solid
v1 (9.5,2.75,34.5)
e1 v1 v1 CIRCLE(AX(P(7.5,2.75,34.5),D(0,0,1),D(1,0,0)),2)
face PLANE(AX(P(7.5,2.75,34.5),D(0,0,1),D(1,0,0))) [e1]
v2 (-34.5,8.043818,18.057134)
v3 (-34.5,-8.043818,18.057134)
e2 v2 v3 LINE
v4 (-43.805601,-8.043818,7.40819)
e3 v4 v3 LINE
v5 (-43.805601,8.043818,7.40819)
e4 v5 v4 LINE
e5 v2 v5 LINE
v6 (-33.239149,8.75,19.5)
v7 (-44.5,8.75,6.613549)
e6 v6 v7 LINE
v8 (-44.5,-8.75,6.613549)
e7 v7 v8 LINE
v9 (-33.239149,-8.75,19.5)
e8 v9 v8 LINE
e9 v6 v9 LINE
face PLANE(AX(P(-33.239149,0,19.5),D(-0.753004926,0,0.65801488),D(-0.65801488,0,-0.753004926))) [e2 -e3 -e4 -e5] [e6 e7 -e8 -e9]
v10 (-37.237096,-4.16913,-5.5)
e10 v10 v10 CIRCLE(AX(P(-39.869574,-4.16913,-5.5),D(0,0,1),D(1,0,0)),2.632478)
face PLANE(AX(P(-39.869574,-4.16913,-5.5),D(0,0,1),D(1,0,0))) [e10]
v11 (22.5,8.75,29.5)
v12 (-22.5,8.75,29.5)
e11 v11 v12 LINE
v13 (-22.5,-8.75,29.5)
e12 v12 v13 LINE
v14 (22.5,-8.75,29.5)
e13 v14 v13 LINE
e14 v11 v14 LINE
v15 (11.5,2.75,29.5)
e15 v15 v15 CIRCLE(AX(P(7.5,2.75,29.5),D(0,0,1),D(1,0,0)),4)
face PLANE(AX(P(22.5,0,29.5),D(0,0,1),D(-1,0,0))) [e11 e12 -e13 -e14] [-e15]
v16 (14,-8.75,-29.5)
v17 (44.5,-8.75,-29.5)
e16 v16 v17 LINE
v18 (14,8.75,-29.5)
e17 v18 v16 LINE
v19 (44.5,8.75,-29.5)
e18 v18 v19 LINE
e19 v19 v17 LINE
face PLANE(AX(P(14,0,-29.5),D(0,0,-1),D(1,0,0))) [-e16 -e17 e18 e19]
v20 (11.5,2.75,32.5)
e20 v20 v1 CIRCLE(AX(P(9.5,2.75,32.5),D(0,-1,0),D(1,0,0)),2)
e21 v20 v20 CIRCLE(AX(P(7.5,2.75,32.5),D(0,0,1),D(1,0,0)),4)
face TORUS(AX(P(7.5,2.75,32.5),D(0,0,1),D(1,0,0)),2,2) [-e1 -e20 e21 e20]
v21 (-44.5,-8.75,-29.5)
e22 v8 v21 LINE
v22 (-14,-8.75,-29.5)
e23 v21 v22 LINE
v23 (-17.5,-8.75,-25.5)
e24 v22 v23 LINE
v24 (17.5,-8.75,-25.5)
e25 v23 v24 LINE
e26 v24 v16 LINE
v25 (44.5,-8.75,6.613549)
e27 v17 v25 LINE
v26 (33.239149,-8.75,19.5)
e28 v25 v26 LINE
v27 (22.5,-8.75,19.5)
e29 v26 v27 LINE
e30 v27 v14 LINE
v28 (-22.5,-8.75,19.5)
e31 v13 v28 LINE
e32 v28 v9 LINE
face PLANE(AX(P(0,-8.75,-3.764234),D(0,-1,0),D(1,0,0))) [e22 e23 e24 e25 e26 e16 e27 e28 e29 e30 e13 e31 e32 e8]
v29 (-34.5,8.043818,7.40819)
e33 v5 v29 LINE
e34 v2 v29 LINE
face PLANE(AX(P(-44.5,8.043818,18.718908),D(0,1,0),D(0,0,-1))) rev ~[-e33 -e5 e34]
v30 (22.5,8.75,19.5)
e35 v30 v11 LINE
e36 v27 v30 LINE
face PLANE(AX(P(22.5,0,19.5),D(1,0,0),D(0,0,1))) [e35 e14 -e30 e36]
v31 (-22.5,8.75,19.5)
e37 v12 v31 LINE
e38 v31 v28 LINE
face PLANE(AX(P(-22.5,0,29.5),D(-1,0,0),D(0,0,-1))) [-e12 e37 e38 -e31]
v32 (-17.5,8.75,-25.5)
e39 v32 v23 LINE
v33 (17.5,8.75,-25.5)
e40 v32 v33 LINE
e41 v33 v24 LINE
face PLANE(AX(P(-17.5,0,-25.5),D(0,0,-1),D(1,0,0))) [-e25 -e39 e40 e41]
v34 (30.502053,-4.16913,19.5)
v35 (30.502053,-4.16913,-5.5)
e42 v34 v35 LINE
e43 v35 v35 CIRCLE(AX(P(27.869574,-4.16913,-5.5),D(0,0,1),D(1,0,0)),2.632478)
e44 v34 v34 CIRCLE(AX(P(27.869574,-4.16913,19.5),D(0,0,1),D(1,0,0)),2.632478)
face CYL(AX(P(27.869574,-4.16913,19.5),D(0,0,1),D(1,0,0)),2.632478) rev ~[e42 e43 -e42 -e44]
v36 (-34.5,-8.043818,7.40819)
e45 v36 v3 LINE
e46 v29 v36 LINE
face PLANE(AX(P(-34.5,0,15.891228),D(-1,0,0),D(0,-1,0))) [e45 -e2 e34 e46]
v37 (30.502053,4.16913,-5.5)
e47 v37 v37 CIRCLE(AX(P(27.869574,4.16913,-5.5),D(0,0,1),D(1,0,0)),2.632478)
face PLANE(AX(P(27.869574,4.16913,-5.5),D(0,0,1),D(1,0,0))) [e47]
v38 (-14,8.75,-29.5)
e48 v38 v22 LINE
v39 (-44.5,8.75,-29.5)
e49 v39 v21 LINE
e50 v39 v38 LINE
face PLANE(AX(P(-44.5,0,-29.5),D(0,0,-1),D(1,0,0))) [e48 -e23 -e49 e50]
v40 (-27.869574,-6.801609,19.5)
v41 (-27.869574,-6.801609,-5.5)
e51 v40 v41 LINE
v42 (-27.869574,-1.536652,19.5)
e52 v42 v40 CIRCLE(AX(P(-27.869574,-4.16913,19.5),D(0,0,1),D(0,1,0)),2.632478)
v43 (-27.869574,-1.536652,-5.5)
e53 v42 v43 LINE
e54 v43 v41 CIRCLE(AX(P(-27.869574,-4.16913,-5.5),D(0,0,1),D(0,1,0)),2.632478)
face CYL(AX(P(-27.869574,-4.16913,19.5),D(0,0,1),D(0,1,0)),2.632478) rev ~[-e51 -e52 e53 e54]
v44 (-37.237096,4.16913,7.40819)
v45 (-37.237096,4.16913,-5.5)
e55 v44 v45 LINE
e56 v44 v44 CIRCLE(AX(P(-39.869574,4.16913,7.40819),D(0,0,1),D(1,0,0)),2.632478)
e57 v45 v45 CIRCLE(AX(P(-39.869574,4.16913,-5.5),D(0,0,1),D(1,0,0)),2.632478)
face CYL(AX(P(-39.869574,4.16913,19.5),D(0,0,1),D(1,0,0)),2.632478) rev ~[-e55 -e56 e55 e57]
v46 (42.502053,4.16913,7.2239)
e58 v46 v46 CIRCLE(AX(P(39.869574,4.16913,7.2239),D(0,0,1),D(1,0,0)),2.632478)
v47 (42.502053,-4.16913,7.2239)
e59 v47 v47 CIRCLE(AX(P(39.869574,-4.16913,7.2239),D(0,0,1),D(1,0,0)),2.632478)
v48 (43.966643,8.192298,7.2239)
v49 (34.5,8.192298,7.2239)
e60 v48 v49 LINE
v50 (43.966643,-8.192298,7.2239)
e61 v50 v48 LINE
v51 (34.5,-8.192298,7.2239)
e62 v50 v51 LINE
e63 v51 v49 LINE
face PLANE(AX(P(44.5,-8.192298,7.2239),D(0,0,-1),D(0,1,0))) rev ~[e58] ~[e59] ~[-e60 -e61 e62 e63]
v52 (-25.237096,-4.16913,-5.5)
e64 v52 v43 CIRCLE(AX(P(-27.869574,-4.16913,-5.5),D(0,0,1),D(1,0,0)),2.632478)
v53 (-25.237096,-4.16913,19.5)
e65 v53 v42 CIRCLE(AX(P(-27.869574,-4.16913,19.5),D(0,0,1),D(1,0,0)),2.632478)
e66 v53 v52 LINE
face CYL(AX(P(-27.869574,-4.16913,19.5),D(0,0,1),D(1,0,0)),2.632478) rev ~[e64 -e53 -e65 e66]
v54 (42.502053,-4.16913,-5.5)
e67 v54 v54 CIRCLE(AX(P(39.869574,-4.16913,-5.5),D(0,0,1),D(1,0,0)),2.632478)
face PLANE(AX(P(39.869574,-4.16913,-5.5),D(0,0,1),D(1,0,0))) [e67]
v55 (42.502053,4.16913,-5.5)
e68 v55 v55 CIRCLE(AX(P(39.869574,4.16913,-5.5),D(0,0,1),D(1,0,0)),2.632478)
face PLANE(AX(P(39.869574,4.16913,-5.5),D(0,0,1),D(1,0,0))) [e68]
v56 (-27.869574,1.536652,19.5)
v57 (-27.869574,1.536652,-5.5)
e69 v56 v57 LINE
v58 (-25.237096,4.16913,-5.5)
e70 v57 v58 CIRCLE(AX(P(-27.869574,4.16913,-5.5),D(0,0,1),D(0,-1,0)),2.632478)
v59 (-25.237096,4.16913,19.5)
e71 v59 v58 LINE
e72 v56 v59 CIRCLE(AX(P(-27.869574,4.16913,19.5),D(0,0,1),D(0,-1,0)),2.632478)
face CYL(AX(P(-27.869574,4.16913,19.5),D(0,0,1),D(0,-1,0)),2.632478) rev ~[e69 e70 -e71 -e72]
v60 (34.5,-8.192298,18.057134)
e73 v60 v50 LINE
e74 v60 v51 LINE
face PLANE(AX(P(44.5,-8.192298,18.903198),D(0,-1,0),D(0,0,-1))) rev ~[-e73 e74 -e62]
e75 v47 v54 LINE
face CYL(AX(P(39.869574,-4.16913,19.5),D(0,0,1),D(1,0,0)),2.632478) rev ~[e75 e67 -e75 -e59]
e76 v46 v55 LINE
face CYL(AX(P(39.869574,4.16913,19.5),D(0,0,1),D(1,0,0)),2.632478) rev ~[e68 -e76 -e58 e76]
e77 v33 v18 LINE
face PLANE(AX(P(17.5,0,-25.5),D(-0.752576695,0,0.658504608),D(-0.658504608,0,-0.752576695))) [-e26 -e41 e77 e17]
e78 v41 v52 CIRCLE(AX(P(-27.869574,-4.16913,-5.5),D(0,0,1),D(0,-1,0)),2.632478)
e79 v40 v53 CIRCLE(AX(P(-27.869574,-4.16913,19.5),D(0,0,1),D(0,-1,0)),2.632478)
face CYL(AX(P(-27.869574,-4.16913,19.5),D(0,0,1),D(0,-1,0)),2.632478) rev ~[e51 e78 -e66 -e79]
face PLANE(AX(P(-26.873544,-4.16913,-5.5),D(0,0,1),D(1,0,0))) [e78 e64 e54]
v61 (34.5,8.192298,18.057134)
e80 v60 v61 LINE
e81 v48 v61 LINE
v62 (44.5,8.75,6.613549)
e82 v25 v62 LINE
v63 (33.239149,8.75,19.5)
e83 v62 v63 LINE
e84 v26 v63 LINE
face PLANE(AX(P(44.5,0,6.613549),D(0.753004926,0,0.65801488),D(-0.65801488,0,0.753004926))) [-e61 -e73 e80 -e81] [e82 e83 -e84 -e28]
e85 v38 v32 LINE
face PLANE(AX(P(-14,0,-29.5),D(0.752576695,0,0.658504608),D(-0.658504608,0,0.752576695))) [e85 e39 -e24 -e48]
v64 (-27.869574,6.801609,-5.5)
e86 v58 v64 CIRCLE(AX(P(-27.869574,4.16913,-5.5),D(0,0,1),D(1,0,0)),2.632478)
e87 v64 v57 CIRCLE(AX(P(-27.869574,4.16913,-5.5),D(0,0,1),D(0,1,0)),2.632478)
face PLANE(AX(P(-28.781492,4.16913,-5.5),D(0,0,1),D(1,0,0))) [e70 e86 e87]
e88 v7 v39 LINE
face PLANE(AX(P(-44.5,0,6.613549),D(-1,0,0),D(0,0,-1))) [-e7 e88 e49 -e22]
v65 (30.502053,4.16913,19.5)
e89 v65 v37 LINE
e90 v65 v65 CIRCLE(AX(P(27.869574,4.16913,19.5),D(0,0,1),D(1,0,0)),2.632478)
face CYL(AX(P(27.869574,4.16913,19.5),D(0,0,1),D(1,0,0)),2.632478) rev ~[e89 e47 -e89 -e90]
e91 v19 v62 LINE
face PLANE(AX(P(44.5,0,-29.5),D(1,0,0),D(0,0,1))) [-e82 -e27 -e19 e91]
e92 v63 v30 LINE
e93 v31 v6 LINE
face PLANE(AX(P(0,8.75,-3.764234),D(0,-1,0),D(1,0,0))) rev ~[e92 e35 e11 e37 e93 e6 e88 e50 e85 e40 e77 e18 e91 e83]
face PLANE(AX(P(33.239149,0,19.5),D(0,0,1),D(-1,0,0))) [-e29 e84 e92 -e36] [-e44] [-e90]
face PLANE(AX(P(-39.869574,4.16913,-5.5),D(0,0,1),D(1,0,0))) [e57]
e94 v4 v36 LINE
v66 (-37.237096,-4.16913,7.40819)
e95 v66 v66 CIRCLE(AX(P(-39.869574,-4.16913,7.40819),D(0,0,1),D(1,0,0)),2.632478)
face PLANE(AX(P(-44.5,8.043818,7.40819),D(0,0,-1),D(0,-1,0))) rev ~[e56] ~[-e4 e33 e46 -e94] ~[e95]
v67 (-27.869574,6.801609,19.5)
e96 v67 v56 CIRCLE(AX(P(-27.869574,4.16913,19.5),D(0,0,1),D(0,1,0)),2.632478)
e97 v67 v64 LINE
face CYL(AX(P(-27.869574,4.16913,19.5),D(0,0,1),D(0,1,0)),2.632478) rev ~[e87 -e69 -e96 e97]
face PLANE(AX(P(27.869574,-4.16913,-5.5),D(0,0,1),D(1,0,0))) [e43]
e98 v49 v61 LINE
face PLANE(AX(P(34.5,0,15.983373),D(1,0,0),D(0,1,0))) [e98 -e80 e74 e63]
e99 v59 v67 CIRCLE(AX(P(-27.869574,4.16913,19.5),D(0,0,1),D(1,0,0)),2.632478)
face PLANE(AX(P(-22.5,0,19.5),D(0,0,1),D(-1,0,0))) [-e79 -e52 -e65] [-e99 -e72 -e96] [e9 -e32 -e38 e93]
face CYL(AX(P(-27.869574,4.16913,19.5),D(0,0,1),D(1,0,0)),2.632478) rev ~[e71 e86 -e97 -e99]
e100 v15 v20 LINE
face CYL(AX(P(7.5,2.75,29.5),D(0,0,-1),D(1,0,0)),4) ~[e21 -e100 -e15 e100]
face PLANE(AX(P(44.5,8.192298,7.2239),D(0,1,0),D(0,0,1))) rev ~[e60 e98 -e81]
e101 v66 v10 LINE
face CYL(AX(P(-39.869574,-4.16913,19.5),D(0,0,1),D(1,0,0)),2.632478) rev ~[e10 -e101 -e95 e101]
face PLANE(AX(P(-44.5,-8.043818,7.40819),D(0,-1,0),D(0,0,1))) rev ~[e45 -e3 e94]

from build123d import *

# Parameters (mm, degrees)
F1_DEPTH = 8.75
F2_W     = 16.3845960051
F2_H     = 5.8396488756
F3_DEPTH = 10
F4_W     = 16.0876363516
F4_H     = 5.6553587645
F5_DEPTH = 10
F6_R     = 2.6324784905
F7_DEPTH = 25
F8_R     = 4
F9_DEPTH = 5
F10_R    = 2


# Not quite as in the source:
# - a feature names something its author has since deleted; it is built from what else it names


with BuildPart() as f1:
    # F0 (on Front) → F1 (new body, symmetric)
    with BuildSketch(Plane.XZ):
        Polygon((22.5, 19.5), (22.5, 29.5), (-22.5, 29.5), (-22.5, 19.5), (-33.2391485572, 19.5), (-44.5, 6.6135488451), (-44.5, -29.5), (-14, -29.5), (-17.5, -25.5), (17.5, -25.5), (14, -29.5), (44.5, -29.5), (44.5, 6.6135488451), (33.2391485572, 19.5), align=None)
    extrude(amount=F1_DEPTH, both=True)

    # F2 (on face) → F3 (cut)
    with BuildSketch(Plane.YZ.offset(44.5)):
        with Locations((0, 15.9833732828)):
            Rectangle(F2_W, F2_H)
        with Locations((0, 10.1437244073)):
            Rectangle(F2_W, F2_H)
    extrude(amount=-F3_DEPTH, mode=Mode.SUBTRACT)

    # F4 (on face) → F5 (cut)
    with BuildSketch(Plane(origin=(-44.5, 0, 0), x_dir=(0, -1, 0), z_dir=(-1, 0, 0))):
        with Locations((0, 15.8912282273)):
            Rectangle(F4_W, F4_H)
        with Locations((0, 10.2358694628)):
            Rectangle(F4_W, F4_H)
    extrude(amount=-F5_DEPTH, mode=Mode.SUBTRACT)

    # F6 (on face) → F7 (cut)
    with BuildSketch(Plane.XY.offset(19.5)):
        with BuildLine():
            ThreePointArc((-25.2370957881, -4.1691302322), (-26.0081308866, -2.3076868402), (-27.8695742786, -1.5366517417))
            Line((-27.8695742786, -1.5366517417), (-27.8695742786, -6.8016087227))
            ThreePointArc((-27.8695742786, -6.8016087227), (-26.0081308866, -6.0305736241), (-25.2370957881, -4.1691302322))
        make_face()
        with BuildLine():
            Line((-27.8695742786, -6.8016087227), (-27.8695742786, -1.5366517417))
            ThreePointArc((-27.8695742786, -1.5366517417), (-30.5020527691, -4.1691302322), (-27.8695742786, -6.8016087227))
        make_face()
        with BuildLine():
            Line((-27.8695742786, 1.5366517417), (-27.8695742786, 6.8016087227))
            ThreePointArc((-27.8695742786, 6.8016087227), (-30.5020527691, 4.1691302322), (-27.8695742786, 1.5366517417))
        make_face()
        with BuildLine():
            ThreePointArc((-25.2370957881, 4.1691302322), (-26.0081308866, 6.0305736241), (-27.8695742786, 6.8016087227))
            Line((-27.8695742786, 6.8016087227), (-27.8695742786, 1.5366517417))
            ThreePointArc((-27.8695742786, 1.5366517417), (-26.0081308866, 2.3076868402), (-25.2370957881, 4.1691302322))
        make_face()
        with Locations((-39.8695742786, 4.1691302322)):
            Circle(F6_R)
        with Locations((-39.8695742786, -4.1691302322)):
            Circle(F6_R)
        with Locations((27.8695742786, 4.1691302322)):
            Circle(F6_R)
        with Locations((27.8695742786, -4.1691302322)):
            Circle(F6_R)
        with Locations((39.8695742786, 4.1691302322)):
            Circle(F6_R)
        with Locations((39.8695742786, -4.1691302322)):
            Circle(F6_R)
    extrude(amount=-F7_DEPTH, mode=Mode.SUBTRACT)

    # F8 (on face) → F9 (join)
    with BuildSketch(Plane.XY.offset(29.5)):
        with Locations((7.5, 2.75)):
            Circle(F8_R)
    extrude(amount=F9_DEPTH)

    # F10
    f10_edges = [f1.edges().sort_by_distance(p)[0] for p in [
        (3.5, 2.75, 34.5),
    ]]
    fillet(f10_edges, radius=F10_R)


solid = f1.part
